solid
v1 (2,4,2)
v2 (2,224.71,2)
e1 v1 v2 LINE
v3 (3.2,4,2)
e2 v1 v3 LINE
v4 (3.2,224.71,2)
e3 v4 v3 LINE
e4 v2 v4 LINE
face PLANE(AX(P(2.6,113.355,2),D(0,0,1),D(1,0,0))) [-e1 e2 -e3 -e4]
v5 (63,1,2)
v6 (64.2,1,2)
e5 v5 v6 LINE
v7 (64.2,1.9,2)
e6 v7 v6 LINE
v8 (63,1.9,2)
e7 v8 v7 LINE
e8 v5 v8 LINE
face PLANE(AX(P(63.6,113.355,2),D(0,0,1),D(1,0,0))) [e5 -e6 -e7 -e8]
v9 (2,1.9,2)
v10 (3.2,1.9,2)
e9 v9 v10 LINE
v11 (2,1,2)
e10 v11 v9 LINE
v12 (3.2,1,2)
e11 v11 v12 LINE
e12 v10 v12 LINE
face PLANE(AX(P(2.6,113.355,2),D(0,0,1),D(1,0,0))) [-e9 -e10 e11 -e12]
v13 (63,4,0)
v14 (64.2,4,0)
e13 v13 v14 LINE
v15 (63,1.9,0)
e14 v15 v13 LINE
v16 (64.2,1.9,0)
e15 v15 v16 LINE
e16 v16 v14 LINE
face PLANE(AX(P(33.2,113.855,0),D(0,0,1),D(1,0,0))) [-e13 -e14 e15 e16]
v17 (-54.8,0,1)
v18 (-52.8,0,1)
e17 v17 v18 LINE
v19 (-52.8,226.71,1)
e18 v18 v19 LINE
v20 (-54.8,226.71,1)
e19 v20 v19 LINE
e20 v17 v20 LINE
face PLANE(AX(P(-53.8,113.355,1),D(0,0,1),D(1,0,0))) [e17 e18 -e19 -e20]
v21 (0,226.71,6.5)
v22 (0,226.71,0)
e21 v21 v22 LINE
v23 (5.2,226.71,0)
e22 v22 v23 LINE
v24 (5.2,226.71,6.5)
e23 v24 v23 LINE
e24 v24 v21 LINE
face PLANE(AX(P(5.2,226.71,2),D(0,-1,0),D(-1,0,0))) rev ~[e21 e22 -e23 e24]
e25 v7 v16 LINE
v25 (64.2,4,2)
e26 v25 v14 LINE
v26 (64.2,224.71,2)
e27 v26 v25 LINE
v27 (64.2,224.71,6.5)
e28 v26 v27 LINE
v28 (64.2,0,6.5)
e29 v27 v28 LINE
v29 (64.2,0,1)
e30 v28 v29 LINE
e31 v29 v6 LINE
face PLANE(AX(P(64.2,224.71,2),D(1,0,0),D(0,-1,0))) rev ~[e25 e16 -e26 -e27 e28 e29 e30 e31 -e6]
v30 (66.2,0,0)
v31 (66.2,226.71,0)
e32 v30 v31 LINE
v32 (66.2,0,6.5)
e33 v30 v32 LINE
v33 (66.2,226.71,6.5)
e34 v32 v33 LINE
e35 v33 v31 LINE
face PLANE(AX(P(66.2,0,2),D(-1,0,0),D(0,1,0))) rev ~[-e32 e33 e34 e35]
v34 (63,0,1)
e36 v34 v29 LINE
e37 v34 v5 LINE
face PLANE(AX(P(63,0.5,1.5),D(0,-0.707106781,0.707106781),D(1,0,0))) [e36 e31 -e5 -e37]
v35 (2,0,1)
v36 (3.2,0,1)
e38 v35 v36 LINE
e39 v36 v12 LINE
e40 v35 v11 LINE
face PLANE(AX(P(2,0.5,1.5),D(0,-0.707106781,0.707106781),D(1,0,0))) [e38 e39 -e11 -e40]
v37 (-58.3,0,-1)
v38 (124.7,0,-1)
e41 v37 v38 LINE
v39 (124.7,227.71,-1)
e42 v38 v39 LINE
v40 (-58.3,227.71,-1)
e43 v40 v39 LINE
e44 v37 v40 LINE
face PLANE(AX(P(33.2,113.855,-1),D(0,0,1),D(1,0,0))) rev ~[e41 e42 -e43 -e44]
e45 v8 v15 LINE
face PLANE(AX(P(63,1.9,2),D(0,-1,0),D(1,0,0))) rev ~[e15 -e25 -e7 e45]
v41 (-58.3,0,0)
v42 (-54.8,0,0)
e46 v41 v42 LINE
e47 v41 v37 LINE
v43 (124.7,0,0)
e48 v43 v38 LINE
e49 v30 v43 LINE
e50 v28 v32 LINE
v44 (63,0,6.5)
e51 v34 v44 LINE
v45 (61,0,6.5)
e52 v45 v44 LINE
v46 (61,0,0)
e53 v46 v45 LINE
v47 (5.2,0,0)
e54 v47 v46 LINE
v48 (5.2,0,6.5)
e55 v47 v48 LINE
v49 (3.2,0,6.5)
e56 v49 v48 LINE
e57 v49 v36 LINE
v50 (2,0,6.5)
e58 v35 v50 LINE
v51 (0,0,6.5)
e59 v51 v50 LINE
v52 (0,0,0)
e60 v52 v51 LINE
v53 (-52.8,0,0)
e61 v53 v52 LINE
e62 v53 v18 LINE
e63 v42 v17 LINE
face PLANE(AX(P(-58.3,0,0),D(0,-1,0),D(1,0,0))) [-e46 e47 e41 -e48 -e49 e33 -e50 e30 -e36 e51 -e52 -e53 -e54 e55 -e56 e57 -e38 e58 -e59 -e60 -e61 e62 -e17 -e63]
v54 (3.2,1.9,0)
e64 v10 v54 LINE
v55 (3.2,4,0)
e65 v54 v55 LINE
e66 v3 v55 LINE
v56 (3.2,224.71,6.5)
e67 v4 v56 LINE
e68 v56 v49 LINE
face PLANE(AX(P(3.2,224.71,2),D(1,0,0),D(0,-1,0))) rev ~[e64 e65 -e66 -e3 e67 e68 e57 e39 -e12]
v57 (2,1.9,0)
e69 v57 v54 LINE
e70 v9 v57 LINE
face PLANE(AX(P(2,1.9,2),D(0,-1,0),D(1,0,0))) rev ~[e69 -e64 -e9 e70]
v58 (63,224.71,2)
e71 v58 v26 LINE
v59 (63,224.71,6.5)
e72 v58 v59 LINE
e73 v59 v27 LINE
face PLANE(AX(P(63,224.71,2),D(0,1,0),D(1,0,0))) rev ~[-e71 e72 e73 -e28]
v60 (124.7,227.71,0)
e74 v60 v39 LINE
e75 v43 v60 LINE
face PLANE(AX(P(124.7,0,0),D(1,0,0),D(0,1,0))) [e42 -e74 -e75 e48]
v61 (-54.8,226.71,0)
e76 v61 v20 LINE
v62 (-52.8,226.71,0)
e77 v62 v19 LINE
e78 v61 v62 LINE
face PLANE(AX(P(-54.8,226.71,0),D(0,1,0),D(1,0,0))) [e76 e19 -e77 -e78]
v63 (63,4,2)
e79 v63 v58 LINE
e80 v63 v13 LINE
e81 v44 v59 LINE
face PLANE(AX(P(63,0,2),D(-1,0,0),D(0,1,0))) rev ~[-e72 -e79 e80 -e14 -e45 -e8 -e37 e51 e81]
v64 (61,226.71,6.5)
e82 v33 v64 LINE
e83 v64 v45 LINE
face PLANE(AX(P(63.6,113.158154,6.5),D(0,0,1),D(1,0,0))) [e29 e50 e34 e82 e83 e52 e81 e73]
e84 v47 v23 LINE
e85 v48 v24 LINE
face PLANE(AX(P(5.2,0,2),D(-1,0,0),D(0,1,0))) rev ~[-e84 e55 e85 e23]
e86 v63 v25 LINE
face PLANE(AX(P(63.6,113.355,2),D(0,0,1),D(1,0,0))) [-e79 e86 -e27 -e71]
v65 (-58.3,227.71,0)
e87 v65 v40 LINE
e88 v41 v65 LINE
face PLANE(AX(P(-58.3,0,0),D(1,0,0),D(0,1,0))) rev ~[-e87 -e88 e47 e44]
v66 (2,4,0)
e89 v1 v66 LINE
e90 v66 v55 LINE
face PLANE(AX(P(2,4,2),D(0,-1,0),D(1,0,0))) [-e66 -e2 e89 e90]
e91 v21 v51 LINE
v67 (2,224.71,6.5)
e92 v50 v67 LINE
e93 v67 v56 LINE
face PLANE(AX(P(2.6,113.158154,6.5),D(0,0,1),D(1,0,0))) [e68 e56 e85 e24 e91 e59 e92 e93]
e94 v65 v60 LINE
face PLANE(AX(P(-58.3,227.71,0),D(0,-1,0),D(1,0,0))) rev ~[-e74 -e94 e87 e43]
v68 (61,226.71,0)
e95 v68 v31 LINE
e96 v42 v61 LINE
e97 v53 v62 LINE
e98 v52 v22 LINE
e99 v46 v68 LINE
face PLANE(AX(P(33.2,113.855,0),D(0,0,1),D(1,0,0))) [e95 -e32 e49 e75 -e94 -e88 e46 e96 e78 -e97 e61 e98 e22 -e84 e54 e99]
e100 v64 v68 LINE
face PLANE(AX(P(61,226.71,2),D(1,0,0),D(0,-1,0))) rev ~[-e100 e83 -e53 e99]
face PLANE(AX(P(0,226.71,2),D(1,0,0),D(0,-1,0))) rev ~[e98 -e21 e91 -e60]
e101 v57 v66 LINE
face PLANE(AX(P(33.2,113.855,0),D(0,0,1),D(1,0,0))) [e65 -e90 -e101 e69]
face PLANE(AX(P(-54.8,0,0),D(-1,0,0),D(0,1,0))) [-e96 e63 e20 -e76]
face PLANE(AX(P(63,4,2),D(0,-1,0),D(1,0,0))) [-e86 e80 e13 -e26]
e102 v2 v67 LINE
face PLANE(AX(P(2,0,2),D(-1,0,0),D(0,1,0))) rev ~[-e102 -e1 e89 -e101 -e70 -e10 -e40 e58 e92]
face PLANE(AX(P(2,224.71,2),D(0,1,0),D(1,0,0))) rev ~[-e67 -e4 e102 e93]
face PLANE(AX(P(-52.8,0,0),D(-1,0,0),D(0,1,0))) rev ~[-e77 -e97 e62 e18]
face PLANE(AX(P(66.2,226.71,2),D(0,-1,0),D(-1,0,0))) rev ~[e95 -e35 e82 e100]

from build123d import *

# Parameters (mm, degrees)
F0_W     = 5.2
F0_H     = 226.71
F1_DEPTH = 2
F3_DEPTH = 4.5
F4_W     = 1.2
F4_H     = 2.1
F5_DEPTH = 25
F6_W     = 183
F6_H     = 227.71
F7_DEPTH = 1
F8_W     = 2
F8_H     = 226.71
F9_DEPTH = 1
F10_SIZE = 1


# Not quite as in the source:
# - a feature names something its author has since deleted; it is built from what else it names


with BuildPart() as f1:
    # F0 (on Top) → F1 (new body)
    with BuildSketch(Plane.XY):
        with Locations((2.6, 113.355)):
            Rectangle(F0_W, F0_H)
    extrude(amount=F1_DEPTH)

    # F2 (on face) → F3 (join)
    with BuildSketch(Plane.XY.offset(2)):
        Polygon((0, 226.71), (0, 0), (2, 0), (2, 224.71), (3.2, 224.71), (3.2, 0), (5.2, 0), (5.2, 226.71), align=None)
    extrude(amount=F3_DEPTH)


with BuildPart() as f1b:
    # F0 (on Top) → F1, piece 2 (new body)
    with BuildSketch(Plane.XY):
        with Locations((63.6, 113.355)):
            Rectangle(F0_W, F0_H)
    extrude(amount=F1_DEPTH)

    # F2 (on face) → F3, piece 2 (join)
    with BuildSketch(Plane.XY.offset(2)):
        Polygon((61, 226.71), (61, 0), (63, 0), (63, 224.71), (64.2, 224.71), (64.2, 0), (66.2, 0), (66.2, 226.71), align=None)
    extrude(amount=F3_DEPTH)


with BuildPart() as f5_tool:
    # F4 (on face) → F5 (new body)
    with BuildSketch(Plane.XY.offset(2)):
        with Locations((2.6, 2.95)):
            Rectangle(F4_W, F4_H)
        with Locations((63.6, 2.95)):
            Rectangle(F4_W, F4_H)
    extrude(amount=-F5_DEPTH)


with BuildPart() as f1_1:
    add(f1.part)

    # F5: cut by f5_tool
    add(f5_tool.part, mode=Mode.SUBTRACT)



with BuildPart() as f1b_1:
    add(f1b.part)

    # F5: cut by f5_tool
    add(f5_tool.part, mode=Mode.SUBTRACT)


with BuildPart() as f1_2:
    add(f1_1.part)

    add(f1b_1.part)  # F7 merges F1b
    # F6 (on Top) → F7 (join)
    with BuildSketch(Plane.XY):
        with Locations((33.2, 113.855)):
            Rectangle(F6_W, F6_H)
    extrude(amount=-F7_DEPTH)

    # F8 (on face) → F9 (join)
    with BuildSketch(Plane.XY):
        with Locations((-53.8, 113.355)):
            Rectangle(F8_W, F8_H)
    extrude(amount=F9_DEPTH)

    # F10
    f10_edges = [f1_2.edges().sort_by_distance(p)[0] for p in [
        (2.6, 0, 2),
        (63.6, 0, 2),
    ]]
    chamfer(f10_edges, length=F10_SIZE)


solid = f1_2.part
